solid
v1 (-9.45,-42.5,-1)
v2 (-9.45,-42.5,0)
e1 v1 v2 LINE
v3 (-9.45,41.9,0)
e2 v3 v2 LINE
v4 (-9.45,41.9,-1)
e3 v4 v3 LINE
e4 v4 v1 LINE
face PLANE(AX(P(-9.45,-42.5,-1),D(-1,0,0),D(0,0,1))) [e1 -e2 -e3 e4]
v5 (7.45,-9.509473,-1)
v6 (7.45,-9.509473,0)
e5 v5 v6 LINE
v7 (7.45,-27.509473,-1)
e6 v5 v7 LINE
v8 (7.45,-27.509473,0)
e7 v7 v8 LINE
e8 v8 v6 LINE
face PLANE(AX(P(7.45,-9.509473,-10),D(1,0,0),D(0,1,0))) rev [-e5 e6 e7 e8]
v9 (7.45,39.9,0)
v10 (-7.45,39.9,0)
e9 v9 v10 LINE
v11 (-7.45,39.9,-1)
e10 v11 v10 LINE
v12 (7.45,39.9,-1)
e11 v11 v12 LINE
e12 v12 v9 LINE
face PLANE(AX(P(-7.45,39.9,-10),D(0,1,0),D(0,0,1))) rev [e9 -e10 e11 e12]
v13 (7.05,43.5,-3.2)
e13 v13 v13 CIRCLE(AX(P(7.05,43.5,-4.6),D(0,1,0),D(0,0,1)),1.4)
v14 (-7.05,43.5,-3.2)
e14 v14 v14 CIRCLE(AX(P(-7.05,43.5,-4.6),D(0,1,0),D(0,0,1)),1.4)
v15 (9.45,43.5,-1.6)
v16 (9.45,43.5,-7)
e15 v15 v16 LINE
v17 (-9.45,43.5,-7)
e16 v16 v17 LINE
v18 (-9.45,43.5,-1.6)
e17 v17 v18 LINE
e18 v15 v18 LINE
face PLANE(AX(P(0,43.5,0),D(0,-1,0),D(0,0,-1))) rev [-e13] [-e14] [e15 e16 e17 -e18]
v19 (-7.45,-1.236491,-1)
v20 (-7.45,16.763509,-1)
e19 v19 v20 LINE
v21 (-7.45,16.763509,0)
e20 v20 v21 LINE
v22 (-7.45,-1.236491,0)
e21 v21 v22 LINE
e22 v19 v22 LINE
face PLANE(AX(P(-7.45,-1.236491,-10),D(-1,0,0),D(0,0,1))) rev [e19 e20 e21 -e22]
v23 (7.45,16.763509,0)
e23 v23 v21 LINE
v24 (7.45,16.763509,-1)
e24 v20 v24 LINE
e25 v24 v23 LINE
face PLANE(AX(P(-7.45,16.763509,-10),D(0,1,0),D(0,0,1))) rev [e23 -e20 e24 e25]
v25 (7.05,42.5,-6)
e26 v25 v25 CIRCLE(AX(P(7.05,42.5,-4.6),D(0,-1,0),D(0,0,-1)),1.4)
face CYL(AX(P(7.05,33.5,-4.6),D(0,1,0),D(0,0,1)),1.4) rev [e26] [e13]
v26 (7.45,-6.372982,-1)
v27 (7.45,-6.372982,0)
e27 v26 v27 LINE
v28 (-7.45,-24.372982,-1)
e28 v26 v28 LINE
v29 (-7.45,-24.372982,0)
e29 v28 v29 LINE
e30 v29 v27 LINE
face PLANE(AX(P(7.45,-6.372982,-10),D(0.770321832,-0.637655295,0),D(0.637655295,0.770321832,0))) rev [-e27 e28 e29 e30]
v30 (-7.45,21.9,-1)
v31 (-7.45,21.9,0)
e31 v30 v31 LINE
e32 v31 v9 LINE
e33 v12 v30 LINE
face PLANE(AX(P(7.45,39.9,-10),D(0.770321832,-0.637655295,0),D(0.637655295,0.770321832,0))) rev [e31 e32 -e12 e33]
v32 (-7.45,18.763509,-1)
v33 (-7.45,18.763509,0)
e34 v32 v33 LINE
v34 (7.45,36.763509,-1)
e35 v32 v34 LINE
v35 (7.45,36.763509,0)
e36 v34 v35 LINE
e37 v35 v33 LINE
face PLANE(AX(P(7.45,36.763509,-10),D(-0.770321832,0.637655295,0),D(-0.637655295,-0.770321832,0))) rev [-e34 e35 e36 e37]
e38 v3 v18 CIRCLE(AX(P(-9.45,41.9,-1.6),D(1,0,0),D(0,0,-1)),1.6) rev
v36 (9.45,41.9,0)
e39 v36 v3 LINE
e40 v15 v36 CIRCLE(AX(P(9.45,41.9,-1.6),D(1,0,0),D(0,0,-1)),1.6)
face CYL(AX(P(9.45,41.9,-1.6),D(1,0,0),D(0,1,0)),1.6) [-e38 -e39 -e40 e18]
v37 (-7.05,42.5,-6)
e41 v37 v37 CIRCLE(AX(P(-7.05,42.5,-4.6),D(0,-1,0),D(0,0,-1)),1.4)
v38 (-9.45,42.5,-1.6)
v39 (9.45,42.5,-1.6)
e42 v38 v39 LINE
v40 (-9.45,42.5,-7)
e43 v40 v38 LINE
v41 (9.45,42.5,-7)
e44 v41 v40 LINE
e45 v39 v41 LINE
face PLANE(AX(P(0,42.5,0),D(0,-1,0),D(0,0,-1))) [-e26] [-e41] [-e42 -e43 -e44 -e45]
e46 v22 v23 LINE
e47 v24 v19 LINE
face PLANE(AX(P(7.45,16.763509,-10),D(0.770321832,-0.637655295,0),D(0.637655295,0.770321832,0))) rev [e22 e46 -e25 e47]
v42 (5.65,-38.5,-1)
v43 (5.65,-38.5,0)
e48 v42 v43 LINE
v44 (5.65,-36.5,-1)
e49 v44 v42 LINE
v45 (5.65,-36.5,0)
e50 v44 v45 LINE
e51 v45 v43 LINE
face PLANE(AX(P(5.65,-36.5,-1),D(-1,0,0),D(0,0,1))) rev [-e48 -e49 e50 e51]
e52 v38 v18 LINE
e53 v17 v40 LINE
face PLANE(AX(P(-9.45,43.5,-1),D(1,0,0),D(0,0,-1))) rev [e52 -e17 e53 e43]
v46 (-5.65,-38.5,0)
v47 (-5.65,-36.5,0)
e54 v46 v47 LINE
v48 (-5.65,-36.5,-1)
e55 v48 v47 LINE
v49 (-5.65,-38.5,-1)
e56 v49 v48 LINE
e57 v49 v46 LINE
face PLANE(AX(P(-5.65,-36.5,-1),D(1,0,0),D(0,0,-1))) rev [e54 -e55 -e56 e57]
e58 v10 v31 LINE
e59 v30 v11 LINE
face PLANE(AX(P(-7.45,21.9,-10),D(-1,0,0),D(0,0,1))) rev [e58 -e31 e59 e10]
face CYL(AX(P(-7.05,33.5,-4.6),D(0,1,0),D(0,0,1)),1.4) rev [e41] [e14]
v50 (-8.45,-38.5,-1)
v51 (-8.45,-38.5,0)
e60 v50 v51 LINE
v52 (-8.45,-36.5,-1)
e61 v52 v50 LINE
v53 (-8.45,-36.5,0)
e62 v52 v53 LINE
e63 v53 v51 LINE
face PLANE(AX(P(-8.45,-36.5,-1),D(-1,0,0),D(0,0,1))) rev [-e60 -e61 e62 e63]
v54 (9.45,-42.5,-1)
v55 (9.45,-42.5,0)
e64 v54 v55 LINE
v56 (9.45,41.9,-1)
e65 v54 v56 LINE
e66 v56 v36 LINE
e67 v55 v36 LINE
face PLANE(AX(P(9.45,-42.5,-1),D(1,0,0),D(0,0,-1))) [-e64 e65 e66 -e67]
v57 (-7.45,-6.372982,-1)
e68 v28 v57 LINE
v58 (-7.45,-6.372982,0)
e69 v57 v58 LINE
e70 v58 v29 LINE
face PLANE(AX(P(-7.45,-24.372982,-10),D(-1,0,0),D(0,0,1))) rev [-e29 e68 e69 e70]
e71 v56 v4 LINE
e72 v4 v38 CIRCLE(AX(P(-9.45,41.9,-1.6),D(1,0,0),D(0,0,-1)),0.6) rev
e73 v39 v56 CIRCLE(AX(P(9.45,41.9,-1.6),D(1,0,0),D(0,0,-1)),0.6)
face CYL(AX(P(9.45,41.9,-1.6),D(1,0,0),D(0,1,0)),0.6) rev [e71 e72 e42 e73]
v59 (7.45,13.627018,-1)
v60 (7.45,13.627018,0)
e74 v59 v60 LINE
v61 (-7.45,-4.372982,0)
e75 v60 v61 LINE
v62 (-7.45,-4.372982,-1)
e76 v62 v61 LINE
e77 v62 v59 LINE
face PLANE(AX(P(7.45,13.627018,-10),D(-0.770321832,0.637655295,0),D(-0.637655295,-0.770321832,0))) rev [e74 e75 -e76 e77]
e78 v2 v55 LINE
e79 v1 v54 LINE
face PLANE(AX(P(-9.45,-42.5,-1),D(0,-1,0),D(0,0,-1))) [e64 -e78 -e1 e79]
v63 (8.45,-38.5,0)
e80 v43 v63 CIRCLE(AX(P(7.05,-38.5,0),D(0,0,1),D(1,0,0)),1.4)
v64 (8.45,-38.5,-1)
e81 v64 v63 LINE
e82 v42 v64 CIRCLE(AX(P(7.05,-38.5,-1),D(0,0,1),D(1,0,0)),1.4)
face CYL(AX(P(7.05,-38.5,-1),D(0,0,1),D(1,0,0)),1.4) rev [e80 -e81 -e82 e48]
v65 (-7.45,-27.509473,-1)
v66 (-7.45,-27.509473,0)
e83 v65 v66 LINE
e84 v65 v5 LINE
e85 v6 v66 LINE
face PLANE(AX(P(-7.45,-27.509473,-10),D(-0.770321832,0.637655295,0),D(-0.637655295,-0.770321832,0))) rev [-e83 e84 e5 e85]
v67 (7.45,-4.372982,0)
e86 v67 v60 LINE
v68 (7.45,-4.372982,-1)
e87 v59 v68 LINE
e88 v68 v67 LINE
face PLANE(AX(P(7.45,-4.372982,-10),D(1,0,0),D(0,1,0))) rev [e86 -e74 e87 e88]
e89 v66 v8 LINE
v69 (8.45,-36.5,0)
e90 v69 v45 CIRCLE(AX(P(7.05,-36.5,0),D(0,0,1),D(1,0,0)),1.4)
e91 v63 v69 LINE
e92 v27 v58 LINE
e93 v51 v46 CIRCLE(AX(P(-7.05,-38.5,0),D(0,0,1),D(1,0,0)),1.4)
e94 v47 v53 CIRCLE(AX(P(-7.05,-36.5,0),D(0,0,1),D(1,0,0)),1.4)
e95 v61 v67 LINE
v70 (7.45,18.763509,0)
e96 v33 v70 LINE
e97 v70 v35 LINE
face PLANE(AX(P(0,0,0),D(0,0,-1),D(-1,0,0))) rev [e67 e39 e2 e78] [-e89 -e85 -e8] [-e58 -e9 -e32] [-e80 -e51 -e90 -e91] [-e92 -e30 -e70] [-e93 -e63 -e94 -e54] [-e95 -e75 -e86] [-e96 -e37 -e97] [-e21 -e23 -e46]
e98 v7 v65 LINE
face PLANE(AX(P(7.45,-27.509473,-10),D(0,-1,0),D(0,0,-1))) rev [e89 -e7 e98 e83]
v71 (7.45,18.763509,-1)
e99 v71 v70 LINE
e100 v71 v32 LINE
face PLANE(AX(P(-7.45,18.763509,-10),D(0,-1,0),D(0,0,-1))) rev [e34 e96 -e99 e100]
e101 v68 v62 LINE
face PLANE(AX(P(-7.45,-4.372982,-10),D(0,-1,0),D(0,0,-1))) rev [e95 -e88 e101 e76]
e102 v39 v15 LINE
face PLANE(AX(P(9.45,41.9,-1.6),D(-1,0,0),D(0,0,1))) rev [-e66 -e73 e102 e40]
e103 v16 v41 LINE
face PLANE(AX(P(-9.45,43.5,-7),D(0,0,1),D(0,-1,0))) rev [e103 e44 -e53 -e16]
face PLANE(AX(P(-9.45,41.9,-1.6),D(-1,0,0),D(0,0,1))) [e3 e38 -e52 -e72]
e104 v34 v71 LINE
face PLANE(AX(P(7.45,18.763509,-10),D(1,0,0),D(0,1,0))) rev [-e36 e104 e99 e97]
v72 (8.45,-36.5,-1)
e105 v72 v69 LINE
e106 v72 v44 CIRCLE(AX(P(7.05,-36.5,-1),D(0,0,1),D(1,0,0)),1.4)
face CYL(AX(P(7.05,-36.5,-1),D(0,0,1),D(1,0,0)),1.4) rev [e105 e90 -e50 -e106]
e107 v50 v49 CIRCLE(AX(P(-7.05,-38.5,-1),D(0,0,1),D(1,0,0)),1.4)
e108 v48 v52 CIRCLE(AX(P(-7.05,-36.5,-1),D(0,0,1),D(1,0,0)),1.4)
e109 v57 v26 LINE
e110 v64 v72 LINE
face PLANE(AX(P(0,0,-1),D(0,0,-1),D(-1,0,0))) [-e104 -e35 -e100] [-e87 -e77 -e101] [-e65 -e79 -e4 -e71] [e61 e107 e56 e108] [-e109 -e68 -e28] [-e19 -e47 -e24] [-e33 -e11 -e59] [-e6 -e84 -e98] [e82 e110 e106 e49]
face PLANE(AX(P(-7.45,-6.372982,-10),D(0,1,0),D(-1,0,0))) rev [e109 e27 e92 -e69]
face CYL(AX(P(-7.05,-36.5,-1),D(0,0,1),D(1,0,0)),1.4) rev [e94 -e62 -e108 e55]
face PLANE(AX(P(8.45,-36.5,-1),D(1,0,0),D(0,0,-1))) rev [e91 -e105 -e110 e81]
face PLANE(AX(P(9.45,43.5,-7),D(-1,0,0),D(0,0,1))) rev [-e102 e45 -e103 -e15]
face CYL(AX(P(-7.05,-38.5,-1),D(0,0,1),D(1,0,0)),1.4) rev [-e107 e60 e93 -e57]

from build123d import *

# Parameters (mm, degrees)
SKETCH1_W                    = 18.9
SKETCH1_H                    = 85
BASE_FLANGE1_DEPTH           = 1
EDGE_FLANGE1_STRIP_W         = 5.2
EDGE_FLANGE1_STRIP_H         = 1
EDGE_FLANGE1_STRIP_CUT_DEPTH = 18.9
EDGE_FLANGE1_DEPTH           = 18.9
SKETCH9_R                    = 1.4
CUT_EXTRUDE1_DEPTH           = 10
CUT_EXTRUDE4_DEPTH           = 10


# Sheet-metal steps are written as plain solids
with BuildPart() as part:
    # Sketch1 → Base-Flange1 (new body)
    with BuildSketch(Plane.XY):
        Rectangle(SKETCH1_W, SKETCH1_H)
        with BuildLine():
            Line((-5.65, -36.5), (-5.65, -38.5))
            ThreePointArc((-5.65, -38.5), (-7.05, -39.9), (-8.45, -38.5))
            Line((-8.45, -38.5), (-8.45, -36.5))
            ThreePointArc((-8.45, -36.5), (-7.05, -35.1), (-5.65, -36.5))
        make_face(mode=Mode.SUBTRACT)
        with BuildLine():
            Line((8.45, -36.5), (8.45, -38.5))
            ThreePointArc((8.45, -38.5), (7.05, -39.9), (5.65, -38.5))
            Line((5.65, -38.5), (5.65, -36.5))
            ThreePointArc((5.65, -36.5), (7.05, -35.1), (8.45, -36.5))
        make_face(mode=Mode.SUBTRACT)
    extrude(amount=-BASE_FLANGE1_DEPTH)

    # Edge-Flange1 strip (across the edge) → Edge-Flange1 strip cut (cut)
    with BuildSketch(Plane(origin=(-9.45, 42.5, -1), x_dir=(0, -1, 0), z_dir=(1, 0, 0))):
        with Locations((-2, -0.5)):
            Rectangle(EDGE_FLANGE1_STRIP_W, EDGE_FLANGE1_STRIP_H)
    extrude(amount=EDGE_FLANGE1_STRIP_CUT_DEPTH, mode=Mode.SUBTRACT)

    # Edge-Flange1 section (across the edge) → Edge-Flange1 (add)
    with BuildSketch(Plane(origin=(-9.45, 42.5, -1), x_dir=(0, -1, 0), z_dir=(1, 0, 0))):
        with BuildLine():
            Line((-1, 0.6), (-1, 6))
            Line((-1, 6), (0, 6))
            Line((0, 6), (0, 0.6))
            ThreePointArc((0, 0.6), (0.175735931, 0.175735931), (0.6, 0))
            Line((0.6, 0), (0.6, -1))
            ThreePointArc((0.6, -1), (-0.53137085, -0.53137085), (-1, 0.6))
        make_face()
    extrude(amount=EDGE_FLANGE1_DEPTH)

    # Sketch9 → Cut-Extrude1 (cut)
    with BuildSketch(Plane(origin=(0, 43.5, 0), x_dir=(1, 0, 0), z_dir=(0, 1, 0))):
        with Locations(Location((-7.05, 4.6, 0), (0, 0, 270))):
            Circle(SKETCH9_R)
        with Locations(Location((7.05, 4.6, 0), (0, 0, 270))):
            Circle(SKETCH9_R)
    extrude(amount=-CUT_EXTRUDE1_DEPTH, mode=Mode.SUBTRACT)

    # Sketch12 → Cut-Extrude4 (cut)
    with BuildSketch(Plane.XY):
        Polygon((7.45, 39.9), (-7.45, 21.9), (-7.45, 39.9), align=None)
        Polygon((7.45, 36.763509145), (-7.45, 18.763509145), (7.45, 18.763509145), align=None)
        Polygon((-7.45, 16.763509145), (7.45, 16.763509145), (-7.45, -1.236490855), align=None)
        Polygon((7.45, 13.62701829), (-7.45, -4.37298171), (7.45, -4.37298171), align=None)
        Polygon((-7.45, -6.37298171), (7.45, -6.37298171), (-7.45, -24.37298171), align=None)
        Polygon((-7.45, -27.509472565), (7.45, -9.509472565), (7.45, -27.509472565), align=None)
    extrude(amount=-CUT_EXTRUDE4_DEPTH, mode=Mode.SUBTRACT)


solid = part.part
